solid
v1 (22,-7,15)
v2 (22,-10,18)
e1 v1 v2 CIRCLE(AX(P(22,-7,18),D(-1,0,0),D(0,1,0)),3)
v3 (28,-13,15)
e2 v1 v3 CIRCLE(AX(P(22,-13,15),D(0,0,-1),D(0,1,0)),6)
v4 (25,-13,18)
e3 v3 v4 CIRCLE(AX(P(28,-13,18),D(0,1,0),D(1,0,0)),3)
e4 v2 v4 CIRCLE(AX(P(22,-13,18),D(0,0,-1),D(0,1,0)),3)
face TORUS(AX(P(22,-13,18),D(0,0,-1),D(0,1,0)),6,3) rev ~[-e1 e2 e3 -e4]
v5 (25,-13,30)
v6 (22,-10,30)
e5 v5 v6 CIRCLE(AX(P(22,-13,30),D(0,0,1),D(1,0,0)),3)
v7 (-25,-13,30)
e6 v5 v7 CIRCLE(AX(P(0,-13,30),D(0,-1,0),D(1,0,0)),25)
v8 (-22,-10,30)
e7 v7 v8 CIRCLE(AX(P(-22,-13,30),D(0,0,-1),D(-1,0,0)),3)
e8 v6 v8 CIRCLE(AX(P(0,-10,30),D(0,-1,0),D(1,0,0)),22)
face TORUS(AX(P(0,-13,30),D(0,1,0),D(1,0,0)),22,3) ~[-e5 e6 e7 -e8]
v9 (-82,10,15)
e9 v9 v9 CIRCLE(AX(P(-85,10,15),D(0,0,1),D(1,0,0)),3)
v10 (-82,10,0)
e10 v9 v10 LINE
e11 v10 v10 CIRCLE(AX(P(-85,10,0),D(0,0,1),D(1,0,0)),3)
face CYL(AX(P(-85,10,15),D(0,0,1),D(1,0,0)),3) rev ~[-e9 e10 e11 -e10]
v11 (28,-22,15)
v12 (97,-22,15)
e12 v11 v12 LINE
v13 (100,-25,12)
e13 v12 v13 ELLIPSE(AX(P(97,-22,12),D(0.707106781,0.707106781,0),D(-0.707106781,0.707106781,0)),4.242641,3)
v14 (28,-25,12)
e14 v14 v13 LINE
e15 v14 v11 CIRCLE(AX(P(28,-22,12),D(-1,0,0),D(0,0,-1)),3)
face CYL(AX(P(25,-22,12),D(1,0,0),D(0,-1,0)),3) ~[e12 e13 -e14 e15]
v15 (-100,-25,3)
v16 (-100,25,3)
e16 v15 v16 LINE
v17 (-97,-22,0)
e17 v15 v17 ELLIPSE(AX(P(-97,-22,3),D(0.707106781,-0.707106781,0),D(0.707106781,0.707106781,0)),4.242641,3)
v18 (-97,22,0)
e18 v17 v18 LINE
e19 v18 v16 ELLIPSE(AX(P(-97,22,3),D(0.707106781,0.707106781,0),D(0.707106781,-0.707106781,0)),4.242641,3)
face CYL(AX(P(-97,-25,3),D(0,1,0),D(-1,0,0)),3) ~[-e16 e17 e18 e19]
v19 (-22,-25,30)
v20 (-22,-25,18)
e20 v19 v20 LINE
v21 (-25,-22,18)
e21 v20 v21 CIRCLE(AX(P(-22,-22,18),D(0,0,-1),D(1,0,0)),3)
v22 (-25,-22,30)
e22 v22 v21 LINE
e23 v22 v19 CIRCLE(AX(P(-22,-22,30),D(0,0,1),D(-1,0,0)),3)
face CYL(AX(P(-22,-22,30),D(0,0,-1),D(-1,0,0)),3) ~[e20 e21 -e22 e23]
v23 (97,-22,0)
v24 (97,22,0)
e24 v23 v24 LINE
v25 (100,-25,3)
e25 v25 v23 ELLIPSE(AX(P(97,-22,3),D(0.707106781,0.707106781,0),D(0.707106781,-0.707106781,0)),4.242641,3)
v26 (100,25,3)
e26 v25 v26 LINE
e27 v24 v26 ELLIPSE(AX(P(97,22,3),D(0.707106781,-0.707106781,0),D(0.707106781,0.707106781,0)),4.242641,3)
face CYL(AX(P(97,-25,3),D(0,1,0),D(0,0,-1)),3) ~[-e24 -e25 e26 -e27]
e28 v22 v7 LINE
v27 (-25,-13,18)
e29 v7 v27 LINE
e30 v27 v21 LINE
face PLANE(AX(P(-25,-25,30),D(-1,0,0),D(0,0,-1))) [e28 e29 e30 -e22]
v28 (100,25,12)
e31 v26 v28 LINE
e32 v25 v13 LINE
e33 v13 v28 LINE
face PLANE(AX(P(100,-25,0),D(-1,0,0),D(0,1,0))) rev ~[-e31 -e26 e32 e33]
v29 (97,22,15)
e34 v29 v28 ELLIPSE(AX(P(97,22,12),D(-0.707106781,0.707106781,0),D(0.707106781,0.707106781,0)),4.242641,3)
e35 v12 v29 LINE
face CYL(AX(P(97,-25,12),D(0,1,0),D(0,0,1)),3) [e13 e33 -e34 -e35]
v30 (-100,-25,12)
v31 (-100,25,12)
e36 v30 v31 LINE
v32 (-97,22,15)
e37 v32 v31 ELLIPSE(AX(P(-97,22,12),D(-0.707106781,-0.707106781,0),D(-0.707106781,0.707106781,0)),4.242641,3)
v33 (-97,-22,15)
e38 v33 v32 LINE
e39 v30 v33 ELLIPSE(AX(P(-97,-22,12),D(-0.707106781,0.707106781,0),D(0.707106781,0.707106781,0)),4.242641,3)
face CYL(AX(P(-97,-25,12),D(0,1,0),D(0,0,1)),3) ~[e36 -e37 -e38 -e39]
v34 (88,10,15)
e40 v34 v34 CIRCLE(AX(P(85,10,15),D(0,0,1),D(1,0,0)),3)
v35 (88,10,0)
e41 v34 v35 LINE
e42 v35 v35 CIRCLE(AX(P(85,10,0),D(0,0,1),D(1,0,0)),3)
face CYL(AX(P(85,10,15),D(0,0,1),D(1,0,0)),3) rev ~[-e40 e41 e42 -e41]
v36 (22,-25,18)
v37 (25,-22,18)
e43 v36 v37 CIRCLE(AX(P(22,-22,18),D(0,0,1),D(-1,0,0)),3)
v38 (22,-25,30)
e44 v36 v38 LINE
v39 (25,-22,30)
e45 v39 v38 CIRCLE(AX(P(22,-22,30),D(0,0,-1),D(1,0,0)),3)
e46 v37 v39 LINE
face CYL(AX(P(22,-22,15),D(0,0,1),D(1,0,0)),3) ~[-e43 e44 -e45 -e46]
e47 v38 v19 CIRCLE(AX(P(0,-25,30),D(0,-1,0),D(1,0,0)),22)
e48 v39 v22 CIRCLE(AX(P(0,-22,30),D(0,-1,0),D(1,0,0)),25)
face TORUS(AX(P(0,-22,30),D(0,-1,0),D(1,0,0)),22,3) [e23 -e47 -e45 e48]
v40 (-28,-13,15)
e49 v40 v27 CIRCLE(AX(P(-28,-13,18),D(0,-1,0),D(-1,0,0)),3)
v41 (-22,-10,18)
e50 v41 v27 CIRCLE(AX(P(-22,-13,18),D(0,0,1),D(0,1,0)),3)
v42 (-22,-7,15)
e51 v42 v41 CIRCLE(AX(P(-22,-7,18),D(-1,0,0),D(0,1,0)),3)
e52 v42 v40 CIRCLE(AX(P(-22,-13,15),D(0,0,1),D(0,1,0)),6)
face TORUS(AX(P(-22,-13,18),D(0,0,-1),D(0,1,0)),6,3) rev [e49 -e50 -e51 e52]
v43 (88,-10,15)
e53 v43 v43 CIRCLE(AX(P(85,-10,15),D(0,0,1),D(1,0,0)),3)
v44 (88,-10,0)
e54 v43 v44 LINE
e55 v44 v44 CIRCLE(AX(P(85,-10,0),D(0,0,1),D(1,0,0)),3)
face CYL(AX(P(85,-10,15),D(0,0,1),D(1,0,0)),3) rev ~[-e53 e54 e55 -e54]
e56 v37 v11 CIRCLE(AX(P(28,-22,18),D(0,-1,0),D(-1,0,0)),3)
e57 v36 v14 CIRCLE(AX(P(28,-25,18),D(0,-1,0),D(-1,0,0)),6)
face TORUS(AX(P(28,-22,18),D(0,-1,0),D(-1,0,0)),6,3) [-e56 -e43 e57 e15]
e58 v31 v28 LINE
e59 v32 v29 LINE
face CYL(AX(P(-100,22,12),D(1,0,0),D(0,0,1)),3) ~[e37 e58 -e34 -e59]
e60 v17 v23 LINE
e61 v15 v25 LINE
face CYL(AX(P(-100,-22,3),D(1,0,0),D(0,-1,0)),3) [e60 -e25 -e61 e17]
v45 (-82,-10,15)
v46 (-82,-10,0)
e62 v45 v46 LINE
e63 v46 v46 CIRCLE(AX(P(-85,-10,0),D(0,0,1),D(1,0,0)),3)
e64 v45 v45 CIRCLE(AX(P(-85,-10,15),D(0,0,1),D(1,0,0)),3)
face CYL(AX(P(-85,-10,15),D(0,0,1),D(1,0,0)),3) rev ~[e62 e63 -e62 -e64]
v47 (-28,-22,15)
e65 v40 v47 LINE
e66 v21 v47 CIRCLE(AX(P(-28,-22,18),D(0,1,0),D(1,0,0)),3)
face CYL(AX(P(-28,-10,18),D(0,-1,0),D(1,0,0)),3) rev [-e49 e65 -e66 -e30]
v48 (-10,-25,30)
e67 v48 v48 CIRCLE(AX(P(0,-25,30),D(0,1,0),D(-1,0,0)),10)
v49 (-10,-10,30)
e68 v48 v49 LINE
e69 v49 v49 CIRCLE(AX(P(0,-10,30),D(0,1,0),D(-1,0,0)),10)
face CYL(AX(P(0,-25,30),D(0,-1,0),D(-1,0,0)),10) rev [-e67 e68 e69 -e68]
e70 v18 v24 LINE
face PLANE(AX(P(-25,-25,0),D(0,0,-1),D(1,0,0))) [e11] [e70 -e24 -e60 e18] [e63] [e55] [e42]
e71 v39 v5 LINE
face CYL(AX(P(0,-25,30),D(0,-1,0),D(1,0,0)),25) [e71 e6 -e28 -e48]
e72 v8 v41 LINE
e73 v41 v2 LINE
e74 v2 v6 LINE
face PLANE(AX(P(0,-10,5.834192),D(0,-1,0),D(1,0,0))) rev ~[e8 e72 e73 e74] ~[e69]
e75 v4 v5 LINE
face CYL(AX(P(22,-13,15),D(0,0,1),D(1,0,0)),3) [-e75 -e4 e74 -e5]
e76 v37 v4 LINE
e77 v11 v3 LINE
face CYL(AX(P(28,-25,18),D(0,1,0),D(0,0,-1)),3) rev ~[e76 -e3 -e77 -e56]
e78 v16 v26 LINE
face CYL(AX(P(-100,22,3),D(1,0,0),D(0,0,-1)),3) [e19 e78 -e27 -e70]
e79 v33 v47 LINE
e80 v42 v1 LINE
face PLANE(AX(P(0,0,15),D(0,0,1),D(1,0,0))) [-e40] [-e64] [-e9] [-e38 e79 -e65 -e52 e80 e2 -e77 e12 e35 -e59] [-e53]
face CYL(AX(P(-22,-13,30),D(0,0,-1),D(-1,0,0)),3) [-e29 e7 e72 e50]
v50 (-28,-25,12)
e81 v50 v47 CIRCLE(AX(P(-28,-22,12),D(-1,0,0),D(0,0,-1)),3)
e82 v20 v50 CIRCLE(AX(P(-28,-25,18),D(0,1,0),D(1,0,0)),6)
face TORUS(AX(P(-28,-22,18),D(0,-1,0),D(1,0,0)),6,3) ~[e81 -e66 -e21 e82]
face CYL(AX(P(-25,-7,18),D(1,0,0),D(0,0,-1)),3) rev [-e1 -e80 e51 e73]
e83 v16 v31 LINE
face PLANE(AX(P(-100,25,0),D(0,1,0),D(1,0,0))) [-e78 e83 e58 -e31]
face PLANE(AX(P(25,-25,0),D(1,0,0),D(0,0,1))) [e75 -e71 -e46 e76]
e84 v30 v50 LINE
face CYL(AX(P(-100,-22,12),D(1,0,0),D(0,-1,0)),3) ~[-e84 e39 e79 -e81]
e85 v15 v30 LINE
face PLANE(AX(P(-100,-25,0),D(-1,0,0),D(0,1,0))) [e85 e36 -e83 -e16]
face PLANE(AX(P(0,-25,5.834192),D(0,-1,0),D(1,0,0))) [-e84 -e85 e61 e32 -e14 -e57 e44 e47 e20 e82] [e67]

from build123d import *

# Parameters (mm, degrees)
F0_W     = 200
F0_H     = 50
F1_DEPTH = 15
F3_DEPTH = 15
F4_R     = 3
F5_DEPTH = 15.001
F6_R     = 3


with BuildPart() as f1:
    # F0 (on Top) → F1 (new body)
    with BuildSketch(Plane.XY):
        Rectangle(F0_W, F0_H)
    extrude(amount=F1_DEPTH)

    # F2 (on face) → F3 (join)
    with BuildSketch(Plane.XZ.offset(25)):
        with BuildLine():
            Line((25, 15), (20, 15))
            ThreePointArc((20, 15), (0, 5), (-20, 15))
            Line((-20, 15), (-25, 15))
            Line((-25, 15), (-25, 0))
            Line((-25, 0), (25, 0))
            Line((25, 0), (25, 15))
        make_face()
        with BuildLine():
            ThreePointArc((-20, 15), (-23.7170824513, 22.0943058496), (-25, 30))
            Line((-25, 30), (-25, 15))
            Line((-25, 15), (-20, 15))
        make_face()
        with BuildLine():
            Line((25, 15), (25, 30))
            ThreePointArc((25, 30), (23.7170824513, 22.0943058496), (20, 15))
            Line((20, 15), (25, 15))
        make_face()
        with BuildLine():
            ThreePointArc((-20, 15), (0, 5), (20, 15))
            Line((20, 15), (-20, 15))
        make_face()
        with BuildLine():
            ThreePointArc((20, 15), (23.7170824513, 22.0943058496), (25, 30))
            Line((25, 30), (10, 30))
            ThreePointArc((10, 30), (0, 20), (-10, 30))
            Line((-10, 30), (-25, 30))
            ThreePointArc((-25, 30), (-23.7170824513, 22.0943058496), (-20, 15))
            Line((-20, 15), (20, 15))
        make_face()
        with BuildLine():
            Line((10, 30), (25, 30))
            ThreePointArc((25, 30), (0, 55), (-25, 30))
            Line((-25, 30), (-10, 30))
            ThreePointArc((-10, 30), (0, 40), (10, 30))
        make_face()
    extrude(amount=-F3_DEPTH)

    # F4 (on face) → F5 (cut, through all)
    with BuildSketch(Plane.XY.offset(15)):
        with Locations((-85, 10)):
            Circle(F4_R)
        with Locations((-85, -10)):
            Circle(F4_R)
        with Locations((85, 10)):
            Circle(F4_R)
        with Locations((85, -10)):
            Circle(F4_R)
    extrude(amount=-F5_DEPTH, mode=Mode.SUBTRACT)

    # F6
    f6_edges = [f1.edges().sort_by_distance(p)[0] for p in [
        (-62.5, -25, 15),
        (-100, 0, 15),
        (0, 25, 15),
        (100, 0, 15),
        (62.5, -25, 15),
        (25, -17.5, 15),
        (-25, -17.5, 15),
        (-25, -10, 22.5),
        (0, -25, 0),
        (100, 0, 0),
        (0, 25, 0),
        (-100, 0, 0),
        (-25, -25, 22.5),
        (0, -25, 55),
        (25, -25, 22.5),
        (0, -10, 15),
        (0, -10, 55),
        (25, -10, 22.5),
    ]]
    fillet(f6_edges, radius=F6_R)


solid = f1.part
